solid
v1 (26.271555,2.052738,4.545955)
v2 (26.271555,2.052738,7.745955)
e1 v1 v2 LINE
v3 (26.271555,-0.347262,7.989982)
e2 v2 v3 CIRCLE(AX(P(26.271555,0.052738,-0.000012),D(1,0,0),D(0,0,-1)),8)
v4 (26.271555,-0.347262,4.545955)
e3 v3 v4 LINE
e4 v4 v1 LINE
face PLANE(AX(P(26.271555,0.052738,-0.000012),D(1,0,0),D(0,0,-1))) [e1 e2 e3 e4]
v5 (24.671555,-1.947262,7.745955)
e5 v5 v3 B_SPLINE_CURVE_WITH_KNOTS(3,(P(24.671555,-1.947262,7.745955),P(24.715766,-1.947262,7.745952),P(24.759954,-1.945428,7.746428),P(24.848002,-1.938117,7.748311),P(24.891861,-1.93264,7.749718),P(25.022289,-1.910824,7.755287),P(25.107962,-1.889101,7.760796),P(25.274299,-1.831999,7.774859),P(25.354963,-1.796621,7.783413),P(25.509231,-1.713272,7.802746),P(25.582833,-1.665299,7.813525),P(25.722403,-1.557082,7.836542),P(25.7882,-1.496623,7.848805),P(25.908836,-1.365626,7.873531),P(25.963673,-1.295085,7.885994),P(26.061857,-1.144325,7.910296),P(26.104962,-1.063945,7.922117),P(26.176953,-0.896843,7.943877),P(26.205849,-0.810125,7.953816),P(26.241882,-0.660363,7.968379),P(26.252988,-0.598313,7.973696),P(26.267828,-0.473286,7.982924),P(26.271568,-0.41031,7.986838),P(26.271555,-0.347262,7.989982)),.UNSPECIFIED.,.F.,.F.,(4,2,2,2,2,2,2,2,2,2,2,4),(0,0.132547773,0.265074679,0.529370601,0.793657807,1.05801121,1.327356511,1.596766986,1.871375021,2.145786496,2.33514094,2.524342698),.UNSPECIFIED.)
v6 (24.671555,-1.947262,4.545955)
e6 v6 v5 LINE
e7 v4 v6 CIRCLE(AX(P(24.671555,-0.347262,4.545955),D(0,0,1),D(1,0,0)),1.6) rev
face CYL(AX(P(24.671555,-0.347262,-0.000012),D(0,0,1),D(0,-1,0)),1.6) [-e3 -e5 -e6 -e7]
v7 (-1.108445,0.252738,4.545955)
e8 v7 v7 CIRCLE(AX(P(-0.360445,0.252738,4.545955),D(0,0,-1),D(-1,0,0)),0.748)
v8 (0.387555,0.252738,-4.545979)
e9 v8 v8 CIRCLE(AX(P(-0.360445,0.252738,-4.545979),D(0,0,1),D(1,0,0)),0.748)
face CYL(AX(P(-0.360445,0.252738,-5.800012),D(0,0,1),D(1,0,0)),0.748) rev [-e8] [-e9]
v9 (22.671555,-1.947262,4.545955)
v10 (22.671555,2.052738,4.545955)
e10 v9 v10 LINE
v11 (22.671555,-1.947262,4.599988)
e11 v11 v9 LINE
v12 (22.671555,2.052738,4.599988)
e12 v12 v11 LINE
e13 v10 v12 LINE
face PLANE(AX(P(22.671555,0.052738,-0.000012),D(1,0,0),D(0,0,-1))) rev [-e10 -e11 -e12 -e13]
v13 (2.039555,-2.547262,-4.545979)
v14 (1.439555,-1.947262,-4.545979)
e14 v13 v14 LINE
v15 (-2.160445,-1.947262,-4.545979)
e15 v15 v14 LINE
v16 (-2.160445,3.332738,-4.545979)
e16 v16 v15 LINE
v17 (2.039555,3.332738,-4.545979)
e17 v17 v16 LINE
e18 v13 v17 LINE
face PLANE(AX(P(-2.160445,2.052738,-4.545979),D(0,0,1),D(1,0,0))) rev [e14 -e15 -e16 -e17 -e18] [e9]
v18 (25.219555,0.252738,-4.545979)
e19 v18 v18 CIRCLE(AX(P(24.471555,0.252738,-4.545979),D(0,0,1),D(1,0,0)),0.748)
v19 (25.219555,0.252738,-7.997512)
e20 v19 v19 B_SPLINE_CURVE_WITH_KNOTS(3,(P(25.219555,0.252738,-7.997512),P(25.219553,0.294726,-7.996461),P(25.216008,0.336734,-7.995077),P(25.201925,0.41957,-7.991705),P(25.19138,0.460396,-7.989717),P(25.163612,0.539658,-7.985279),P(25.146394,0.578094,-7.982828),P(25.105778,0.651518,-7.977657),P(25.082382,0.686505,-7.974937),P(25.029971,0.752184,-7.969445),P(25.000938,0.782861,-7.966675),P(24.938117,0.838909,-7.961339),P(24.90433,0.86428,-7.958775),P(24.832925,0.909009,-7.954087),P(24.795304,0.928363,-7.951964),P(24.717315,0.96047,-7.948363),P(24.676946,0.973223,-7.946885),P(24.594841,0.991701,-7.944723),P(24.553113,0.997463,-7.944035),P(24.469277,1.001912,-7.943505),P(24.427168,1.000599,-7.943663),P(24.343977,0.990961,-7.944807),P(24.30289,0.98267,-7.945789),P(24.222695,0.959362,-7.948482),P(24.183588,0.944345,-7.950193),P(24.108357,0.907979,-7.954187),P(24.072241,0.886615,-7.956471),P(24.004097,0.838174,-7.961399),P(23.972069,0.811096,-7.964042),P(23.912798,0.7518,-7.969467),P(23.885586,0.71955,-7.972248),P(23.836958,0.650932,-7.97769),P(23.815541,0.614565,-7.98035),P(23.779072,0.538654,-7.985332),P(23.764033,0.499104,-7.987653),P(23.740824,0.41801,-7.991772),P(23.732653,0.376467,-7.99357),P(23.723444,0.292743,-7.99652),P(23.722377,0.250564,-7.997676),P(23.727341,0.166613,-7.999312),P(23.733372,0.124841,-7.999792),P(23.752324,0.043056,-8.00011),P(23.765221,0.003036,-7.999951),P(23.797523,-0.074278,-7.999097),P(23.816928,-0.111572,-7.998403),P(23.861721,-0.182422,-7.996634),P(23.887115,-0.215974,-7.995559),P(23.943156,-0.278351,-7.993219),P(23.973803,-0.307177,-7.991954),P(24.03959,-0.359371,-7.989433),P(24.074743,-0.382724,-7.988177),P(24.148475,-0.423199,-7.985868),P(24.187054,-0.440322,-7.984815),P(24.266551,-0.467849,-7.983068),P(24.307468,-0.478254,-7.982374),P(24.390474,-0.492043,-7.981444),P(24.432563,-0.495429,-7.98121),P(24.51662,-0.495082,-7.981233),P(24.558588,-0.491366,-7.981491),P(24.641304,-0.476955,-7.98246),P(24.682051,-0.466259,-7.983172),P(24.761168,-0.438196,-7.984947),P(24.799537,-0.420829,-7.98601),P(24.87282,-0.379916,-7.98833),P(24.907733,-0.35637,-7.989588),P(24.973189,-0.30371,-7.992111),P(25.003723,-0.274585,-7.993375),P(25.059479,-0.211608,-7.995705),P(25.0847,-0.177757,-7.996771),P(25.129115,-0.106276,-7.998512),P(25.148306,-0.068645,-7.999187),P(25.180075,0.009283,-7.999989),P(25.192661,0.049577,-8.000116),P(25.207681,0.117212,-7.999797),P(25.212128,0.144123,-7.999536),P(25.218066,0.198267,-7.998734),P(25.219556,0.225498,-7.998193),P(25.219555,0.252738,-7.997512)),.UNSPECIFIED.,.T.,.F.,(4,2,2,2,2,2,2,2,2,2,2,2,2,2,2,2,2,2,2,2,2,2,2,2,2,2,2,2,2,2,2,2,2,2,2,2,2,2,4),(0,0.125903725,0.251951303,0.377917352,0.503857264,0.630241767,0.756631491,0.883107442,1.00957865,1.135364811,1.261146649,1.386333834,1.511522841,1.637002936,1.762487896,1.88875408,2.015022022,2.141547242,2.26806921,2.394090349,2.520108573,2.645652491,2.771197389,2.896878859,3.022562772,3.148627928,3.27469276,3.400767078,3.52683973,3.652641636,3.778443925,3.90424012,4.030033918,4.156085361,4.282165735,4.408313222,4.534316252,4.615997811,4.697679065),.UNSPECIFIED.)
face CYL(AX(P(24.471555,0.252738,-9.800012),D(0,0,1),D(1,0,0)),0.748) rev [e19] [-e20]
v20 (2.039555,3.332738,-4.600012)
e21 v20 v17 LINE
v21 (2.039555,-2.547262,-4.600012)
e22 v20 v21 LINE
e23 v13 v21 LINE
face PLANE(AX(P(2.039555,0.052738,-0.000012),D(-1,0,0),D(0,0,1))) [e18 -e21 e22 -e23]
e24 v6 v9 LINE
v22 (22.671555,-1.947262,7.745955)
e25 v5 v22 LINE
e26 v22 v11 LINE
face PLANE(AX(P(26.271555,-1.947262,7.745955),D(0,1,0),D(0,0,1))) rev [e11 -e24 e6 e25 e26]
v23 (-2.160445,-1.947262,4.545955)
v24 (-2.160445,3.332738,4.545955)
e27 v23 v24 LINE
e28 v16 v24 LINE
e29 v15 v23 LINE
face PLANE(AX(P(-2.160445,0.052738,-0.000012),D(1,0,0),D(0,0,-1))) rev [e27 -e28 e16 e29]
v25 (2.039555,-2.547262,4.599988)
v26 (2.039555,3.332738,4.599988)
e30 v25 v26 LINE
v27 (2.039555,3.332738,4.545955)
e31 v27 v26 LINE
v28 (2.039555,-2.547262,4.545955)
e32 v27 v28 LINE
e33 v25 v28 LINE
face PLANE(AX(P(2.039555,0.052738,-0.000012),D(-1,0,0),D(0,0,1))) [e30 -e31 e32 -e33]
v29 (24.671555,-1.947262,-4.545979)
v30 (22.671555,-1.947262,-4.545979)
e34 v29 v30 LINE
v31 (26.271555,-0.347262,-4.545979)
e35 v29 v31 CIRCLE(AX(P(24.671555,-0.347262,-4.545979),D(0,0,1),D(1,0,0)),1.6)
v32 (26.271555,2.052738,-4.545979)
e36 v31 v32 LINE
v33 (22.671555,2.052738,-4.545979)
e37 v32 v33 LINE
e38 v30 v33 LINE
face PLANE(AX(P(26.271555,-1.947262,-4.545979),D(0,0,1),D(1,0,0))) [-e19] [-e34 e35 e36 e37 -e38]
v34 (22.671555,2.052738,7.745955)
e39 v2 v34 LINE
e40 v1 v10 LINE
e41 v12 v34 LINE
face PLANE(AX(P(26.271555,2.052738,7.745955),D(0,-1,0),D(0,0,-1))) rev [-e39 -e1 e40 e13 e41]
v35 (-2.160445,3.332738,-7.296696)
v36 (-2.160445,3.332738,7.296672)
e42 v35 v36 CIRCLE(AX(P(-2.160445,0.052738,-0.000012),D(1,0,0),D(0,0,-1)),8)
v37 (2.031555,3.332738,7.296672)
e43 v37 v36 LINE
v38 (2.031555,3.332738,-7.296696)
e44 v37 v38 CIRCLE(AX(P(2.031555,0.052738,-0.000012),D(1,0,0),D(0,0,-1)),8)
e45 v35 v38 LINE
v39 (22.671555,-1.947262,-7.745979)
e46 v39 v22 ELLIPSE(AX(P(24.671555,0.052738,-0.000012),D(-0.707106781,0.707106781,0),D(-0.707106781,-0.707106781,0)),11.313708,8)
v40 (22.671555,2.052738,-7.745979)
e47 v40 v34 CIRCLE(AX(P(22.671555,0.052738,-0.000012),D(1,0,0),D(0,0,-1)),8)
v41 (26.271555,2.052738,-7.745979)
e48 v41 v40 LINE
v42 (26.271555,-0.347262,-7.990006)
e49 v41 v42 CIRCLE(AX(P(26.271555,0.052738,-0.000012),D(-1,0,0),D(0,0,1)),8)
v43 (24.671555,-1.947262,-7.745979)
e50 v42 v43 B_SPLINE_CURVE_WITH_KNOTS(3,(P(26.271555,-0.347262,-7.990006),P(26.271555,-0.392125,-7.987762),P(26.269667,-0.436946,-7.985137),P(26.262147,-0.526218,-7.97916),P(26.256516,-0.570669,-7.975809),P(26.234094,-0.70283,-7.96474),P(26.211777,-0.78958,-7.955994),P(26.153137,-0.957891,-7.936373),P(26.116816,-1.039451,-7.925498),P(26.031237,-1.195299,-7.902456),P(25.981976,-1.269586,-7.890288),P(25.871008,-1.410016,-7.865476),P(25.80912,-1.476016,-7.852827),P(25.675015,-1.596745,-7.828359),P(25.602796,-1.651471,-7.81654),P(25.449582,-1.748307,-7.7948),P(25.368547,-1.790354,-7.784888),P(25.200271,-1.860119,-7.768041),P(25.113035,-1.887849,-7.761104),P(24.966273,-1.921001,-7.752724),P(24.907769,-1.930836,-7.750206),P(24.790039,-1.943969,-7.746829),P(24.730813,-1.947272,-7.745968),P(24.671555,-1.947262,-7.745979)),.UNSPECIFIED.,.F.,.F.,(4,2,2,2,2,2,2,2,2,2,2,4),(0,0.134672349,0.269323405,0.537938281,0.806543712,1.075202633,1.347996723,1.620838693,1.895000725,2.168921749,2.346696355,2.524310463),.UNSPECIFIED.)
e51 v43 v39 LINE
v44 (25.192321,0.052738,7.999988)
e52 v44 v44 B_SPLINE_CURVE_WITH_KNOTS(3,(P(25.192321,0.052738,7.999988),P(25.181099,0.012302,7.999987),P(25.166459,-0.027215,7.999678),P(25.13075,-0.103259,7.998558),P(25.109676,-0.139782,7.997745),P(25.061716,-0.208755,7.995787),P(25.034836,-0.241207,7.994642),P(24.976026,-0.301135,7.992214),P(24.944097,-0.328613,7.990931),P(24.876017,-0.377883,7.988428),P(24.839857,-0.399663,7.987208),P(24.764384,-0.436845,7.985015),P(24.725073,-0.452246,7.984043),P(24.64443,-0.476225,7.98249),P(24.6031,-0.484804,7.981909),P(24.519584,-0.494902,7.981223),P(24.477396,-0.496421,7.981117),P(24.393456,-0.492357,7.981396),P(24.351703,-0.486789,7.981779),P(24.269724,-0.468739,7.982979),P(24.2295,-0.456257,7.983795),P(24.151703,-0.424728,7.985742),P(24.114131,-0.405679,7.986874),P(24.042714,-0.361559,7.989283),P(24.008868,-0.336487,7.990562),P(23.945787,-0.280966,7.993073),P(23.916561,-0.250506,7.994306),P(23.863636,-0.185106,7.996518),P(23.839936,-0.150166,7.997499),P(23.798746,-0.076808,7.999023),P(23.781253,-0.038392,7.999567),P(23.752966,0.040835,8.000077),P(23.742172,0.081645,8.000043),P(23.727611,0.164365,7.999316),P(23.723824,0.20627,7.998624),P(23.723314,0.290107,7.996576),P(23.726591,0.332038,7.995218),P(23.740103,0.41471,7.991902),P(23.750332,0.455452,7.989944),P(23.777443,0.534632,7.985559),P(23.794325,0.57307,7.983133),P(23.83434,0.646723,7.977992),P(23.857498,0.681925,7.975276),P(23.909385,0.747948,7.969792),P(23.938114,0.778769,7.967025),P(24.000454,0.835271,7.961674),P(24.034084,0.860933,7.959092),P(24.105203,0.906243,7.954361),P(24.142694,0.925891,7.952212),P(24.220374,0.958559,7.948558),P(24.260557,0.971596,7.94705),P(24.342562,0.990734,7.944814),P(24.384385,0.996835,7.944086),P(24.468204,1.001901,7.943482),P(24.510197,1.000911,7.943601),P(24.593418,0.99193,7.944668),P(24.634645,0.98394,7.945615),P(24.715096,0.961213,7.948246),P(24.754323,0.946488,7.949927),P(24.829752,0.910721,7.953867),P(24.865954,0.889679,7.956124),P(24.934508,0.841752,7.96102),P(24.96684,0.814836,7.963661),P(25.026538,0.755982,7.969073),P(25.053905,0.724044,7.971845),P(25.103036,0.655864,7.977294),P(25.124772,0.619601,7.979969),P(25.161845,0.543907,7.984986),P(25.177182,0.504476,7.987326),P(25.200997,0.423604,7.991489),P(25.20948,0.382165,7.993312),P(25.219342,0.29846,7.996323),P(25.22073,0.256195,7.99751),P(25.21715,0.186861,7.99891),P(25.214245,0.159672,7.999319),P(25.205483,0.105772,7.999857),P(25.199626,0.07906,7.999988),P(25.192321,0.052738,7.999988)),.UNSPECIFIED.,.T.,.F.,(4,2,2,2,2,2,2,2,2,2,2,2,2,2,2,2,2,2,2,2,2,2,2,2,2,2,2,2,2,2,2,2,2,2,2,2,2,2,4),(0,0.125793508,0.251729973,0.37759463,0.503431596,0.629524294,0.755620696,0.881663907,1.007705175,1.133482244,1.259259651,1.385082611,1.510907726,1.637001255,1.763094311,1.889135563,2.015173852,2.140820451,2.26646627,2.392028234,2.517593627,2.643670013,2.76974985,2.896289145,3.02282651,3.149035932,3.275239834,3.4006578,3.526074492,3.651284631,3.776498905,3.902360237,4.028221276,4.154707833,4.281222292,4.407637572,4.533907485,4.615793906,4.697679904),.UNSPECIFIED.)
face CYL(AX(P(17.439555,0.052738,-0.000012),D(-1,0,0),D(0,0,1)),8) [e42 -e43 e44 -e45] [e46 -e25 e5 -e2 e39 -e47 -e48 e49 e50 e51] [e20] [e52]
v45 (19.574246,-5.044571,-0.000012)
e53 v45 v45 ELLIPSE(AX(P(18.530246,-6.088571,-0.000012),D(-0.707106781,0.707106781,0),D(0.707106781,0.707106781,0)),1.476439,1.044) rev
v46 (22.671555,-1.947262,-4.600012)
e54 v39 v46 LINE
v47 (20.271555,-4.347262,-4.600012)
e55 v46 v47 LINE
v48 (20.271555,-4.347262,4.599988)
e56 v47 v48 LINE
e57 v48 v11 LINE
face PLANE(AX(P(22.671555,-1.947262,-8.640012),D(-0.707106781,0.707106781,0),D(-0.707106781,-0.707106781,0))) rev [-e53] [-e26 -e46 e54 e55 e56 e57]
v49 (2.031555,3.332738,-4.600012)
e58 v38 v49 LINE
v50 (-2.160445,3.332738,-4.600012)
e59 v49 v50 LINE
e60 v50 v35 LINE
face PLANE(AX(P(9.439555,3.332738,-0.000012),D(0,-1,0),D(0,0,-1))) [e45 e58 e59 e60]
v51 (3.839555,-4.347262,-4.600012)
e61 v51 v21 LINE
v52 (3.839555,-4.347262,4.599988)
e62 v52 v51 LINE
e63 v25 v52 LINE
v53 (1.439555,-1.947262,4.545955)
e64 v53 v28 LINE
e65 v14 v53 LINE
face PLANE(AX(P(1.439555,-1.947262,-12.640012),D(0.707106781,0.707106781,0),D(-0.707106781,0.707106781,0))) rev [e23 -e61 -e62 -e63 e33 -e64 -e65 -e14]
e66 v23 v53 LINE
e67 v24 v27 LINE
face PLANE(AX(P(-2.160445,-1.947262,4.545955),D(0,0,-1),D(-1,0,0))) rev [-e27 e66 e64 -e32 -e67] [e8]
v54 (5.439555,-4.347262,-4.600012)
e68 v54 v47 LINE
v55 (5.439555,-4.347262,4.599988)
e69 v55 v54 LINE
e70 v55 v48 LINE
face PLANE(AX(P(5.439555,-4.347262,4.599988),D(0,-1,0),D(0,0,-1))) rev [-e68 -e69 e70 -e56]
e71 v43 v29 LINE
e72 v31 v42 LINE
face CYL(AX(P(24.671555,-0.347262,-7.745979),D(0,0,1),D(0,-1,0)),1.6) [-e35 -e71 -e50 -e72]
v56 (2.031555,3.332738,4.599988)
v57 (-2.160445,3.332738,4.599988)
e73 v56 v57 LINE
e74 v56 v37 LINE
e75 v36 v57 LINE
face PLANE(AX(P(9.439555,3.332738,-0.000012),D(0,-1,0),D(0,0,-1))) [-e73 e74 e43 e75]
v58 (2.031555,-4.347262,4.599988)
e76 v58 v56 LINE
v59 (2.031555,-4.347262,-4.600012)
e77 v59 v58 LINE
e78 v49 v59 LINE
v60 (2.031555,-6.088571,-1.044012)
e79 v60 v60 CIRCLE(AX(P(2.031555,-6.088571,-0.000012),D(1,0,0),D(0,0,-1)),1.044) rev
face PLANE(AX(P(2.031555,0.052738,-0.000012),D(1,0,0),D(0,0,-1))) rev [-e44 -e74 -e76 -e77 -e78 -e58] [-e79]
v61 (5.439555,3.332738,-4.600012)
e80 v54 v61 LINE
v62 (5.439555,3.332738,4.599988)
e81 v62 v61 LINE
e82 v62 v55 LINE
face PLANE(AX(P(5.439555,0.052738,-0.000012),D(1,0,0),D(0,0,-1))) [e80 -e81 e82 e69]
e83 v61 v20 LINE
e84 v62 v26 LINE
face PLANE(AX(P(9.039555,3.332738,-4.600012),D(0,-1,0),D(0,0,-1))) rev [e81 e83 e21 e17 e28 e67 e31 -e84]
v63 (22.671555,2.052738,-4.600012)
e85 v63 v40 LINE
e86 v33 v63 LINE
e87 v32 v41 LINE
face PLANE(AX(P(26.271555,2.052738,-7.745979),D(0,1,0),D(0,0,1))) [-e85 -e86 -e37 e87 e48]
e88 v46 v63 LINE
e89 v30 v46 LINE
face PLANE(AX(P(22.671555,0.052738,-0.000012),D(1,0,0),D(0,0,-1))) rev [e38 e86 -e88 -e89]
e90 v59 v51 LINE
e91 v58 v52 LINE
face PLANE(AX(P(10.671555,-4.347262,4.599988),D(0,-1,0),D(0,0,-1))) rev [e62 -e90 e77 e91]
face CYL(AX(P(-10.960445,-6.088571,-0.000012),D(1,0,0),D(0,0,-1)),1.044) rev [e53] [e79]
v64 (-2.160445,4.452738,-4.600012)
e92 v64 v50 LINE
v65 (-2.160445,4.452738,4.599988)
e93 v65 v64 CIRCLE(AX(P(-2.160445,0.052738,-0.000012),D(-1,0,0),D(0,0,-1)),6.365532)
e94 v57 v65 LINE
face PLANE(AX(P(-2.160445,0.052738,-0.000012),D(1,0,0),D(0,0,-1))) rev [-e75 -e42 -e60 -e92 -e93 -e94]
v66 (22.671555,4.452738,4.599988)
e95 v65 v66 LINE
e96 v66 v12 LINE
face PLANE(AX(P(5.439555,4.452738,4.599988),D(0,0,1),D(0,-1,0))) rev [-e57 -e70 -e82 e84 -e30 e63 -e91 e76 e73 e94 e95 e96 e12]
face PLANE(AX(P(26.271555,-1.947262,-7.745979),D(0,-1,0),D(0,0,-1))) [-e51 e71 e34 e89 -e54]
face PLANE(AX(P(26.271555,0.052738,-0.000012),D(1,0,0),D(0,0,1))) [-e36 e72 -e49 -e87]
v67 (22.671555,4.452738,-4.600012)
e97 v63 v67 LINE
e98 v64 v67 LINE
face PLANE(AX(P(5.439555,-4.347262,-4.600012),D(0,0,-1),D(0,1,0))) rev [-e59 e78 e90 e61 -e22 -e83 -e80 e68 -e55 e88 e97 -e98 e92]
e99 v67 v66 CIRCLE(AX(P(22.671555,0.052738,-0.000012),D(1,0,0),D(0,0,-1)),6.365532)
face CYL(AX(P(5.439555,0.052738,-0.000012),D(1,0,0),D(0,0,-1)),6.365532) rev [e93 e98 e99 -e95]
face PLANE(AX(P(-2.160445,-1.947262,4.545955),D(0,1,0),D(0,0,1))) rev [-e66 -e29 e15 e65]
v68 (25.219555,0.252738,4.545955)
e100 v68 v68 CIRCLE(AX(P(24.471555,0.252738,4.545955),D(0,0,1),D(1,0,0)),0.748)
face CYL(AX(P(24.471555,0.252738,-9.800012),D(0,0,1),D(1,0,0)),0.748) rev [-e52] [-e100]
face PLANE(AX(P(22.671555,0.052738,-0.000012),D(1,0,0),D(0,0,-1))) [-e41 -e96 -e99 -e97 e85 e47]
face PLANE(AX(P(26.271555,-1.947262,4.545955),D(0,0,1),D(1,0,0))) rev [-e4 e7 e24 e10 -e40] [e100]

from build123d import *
from build123d.topology import SkipClean

# Parameters (mm, degrees)
SKETCH1_R           = 10
BOSS_EXTRUDE1_DEPTH = 10
SKETCH4_R           = 1.305
CUT_EXTRUDE3_DEPTH  = 25.5
BOSS_EXTRUDE2_START = 4.5
BOSS_EXTRUDE2_DEPTH = 4.5
SKETCH6_R           = 0.935
CUT_EXTRUDE4_DEPTH  = 12.25
SKETCH7_W           = 11.364916732
SKETCH7_H           = 5
BOSS_EXTRUDE3_DEPTH = 4.5
SKETCH8_R           = 0.935
CUT_EXTRUDE5_DEPTH  = 7.25
BOSS_EXTRUDE4_DEPTH = 4.5
CUT_EXTRUDE6_START  = -0.75
CUT_EXTRUDE6_DEPTH  = 0.75
SKETCH12_W          = 5.25
SKETCH12_H          = 4
CUT_EXTRUDE7_DEPTH  = 1.6
CUT_EXTRUDE8_DEPTH  = 15.8
FILLET1_R           = 2
CUT_EXTRUDE9_DEPTH  = 10.8
SKETCH15_W          = 11.364916732
SKETCH15_H          = 6.6
CUT_EXTRUDE10_DEPTH = 1.6
CUT_EXTRUDE11_DEPTH = 15
BOSS_EXTRUDE5_REACH = 35.438
SKETCH17_R          = 10
SKETCH17_R_2        = 1.305
CUT_EXTRUDE12_DEPTH = 14
SCALE1_SCALE        = 0.8


# Read off the part's stored shape, not the designer's step: Cut-Extrude6
with BuildPart() as part:
    # Sketch1 → Boss-Extrude1 (new, symmetric)
    with BuildSketch(Plane(origin=(0, 0, 0), x_dir=(0, 0, -1), z_dir=(1, 0, 0))):
        Circle(SKETCH1_R)
    extrude(amount=BOSS_EXTRUDE1_DEPTH, both=True)

    # Sketch4 → Cut-Extrude3 (cut, symmetric)
    with BuildSketch(Plane(origin=(0, -0.76336978, 0), x_dir=(0, 0, -1), z_dir=(1, 0, 0))):
        with Locations((0, -6.913267104)):
            Circle(SKETCH4_R)
    extrude(amount=CUT_EXTRUDE3_DEPTH, both=True, mode=Mode.SUBTRACT)

    # Sketch5 → Boss-Extrude2 (add)
    with BuildSketch(Plane(origin=(10, 0, 0), x_dir=(0, 0, -1), z_dir=(1, 0, 0)).offset(BOSS_EXTRUDE2_START)):
        with BuildLine():
            Line((-9.682458366, -2.5), (-5.682458366, -2.5))
            Line((-5.682458366, -2.5), (-5.682458366, 2.5))
            Line((-5.682458366, 2.5), (-9.682458366, 2.5))
            ThreePointArc((-9.682458366, 2.5), (-10, 0), (-9.682458366, -2.5))
        make_face()
    boss_extrude2 = extrude(amount=-BOSS_EXTRUDE2_DEPTH)

    # Mirror1: Boss-Extrude2 across plane
    add(boss_extrude2.mirror(Plane.XY))

    # Sketch6 → Cut-Extrude4 (cut, symmetric)
    with SkipClean():  # the faces are left unmerged after this step: merging them gives an invalid solid
        with BuildSketch(Plane.XY):
            with Locations((12.25, 0.25)):
                Circle(SKETCH6_R)
        extrude(amount=CUT_EXTRUDE4_DEPTH, both=True, mode=Mode.SUBTRACT)

    # Sketch7 → Boss-Extrude3 (add)
    with SkipClean():  # the faces are left unmerged after this step: merging them gives an invalid solid
        with BuildSketch(Plane.ZY.offset(10)):
            Rectangle(SKETCH7_W, SKETCH7_H)
        extrude(amount=BOSS_EXTRUDE3_DEPTH)

    # Sketch8 → Cut-Extrude5 (cut, symmetric)
    with SkipClean():  # the faces are left unmerged after this step: merging them gives an invalid solid
        with BuildSketch(Plane.XY):
            with Locations((-12.25, 0.25)):
                Circle(SKETCH8_R)
        extrude(amount=CUT_EXTRUDE5_DEPTH, both=True, mode=Mode.SUBTRACT)

    # Sketch10 → Boss-Extrude4 (add)
    with SkipClean():  # the faces are left unmerged after this step: merging them gives an invalid solid
        with BuildSketch(Plane.ZY.offset(10)):
            with BuildLine():
                Line((9.682458366, 2.5), (-9.682458366, 2.5))
                ThreePointArc((-9.682458366, 2.5), (0, 10), (9.682458366, 2.5))
            make_face()
        extrude(amount=BOSS_EXTRUDE4_DEPTH)

    # Cut-Extrude6 outline → Cut-Extrude6 (cut)
    with SkipClean():  # the faces are left unmerged after this step: merging them gives an invalid solid
        with BuildSketch(Plane.ZY.offset(10).offset(CUT_EXTRUDE6_START)):
            with BuildLine():
                ThreePointArc((-9.682458366, 2.5), (-9.369942303, -3.493448331), (-5.682458366, -8.228588392))
                Line((-5.682458366, -8.228588392), (-5.682458366, 2.5))
                Line((-5.682458366, 2.5), (-9.682458366, 2.5))
            make_face()
            with BuildLine():
                Line((5.682458366, 2.5), (5.682458366, -8.228588392))
                ThreePointArc((5.682458366, -8.228588392), (9.369942303, -3.493448331), (9.682458366, 2.5))
                Line((9.682458366, 2.5), (5.682458366, 2.5))
            make_face()
        extrude(amount=CUT_EXTRUDE6_DEPTH, mode=Mode.SUBTRACT)

    # Sketch12 → Cut-Extrude7 (cut)
    with SkipClean():  # the faces are left unmerged after this step: merging them gives an invalid solid
        with BuildSketch(Plane.XZ.offset(-2.5)):
            with Locations((-11.875, -7.682458366)):
                Rectangle(SKETCH12_W, SKETCH12_H)
            with Locations((-11.875, 7.682458366)):
                Rectangle(SKETCH12_W, SKETCH12_H)
        extrude(amount=-CUT_EXTRUDE7_DEPTH, mode=Mode.SUBTRACT)

    # Sketch13 → Cut-Extrude8 (cut, symmetric)
    with SkipClean():  # the faces are left unmerged after this step: merging them gives an invalid solid
        with BuildSketch(Plane.XY):
            Polygon((-10, -8.228588392), (-10, -2.5), (-2.5, -10), (-10, -10), align=None)
        extrude(amount=CUT_EXTRUDE8_DEPTH, both=True, mode=Mode.SUBTRACT)

    # Fillet1
    fillet1_edges = [part.edges().sort_by_distance(p)[0] for p in [
        (14.5, -2.5, 7.682458366),
        (14.5, -2.5, -7.682458366),
    ]]
    fillet(fillet1_edges, radius=FILLET1_R)

    # Sketch14 → Cut-Extrude9 (cut, symmetric)
    with SkipClean():  # the faces are left unmerged after this step: merging them gives an invalid solid
        with BuildSketch(Plane.XY):
            Polygon((10, -10), (10, -2.5), (2.5, -10), align=None)
        extrude(amount=CUT_EXTRUDE9_DEPTH, both=True, mode=Mode.SUBTRACT)

    # Sketch15 → Cut-Extrude10 (cut)
    with SkipClean():  # the faces are left unmerged after this step: merging them gives an invalid solid
        with BuildSketch(Plane(origin=(10, 0, 0), x_dir=(0, 0, -1), z_dir=(1, 0, 0))):
            with Locations((0, -0.8)):
                Rectangle(SKETCH15_W, SKETCH15_H)
        extrude(amount=-CUT_EXTRUDE10_DEPTH, mode=Mode.SUBTRACT)

    # Sketch16 → Cut-Extrude11 (cut)
    with SkipClean():  # the faces are left unmerged after this step: merging them gives an invalid solid
        with BuildSketch(Plane(origin=(10, 0, 0), x_dir=(0, 0, -1), z_dir=(1, 0, 0))):
            with BuildLine():
                Line((-5.75, 5.5), (-5.75, -5.5))
                Line((-5.75, -5.5), (5.75, -5.5))
                Line((5.75, -5.5), (5.75, 5.5))
                ThreePointArc((5.75, 5.5), (0, 7.956915231), (-5.75, 5.5))
            make_face()
        extrude(amount=-CUT_EXTRUDE11_DEPTH, mode=Mode.SUBTRACT)


with BuildPart() as body_2:
    # Split1: the piece on the far side of the plane
    add(part.part)
    split(bisect_by=Plane(origin=(0, 0, 0), x_dir=(0, 0, 1), z_dir=(1, 0, 0)), keep=Keep.BOTTOM)


with BuildPart() as part_1:
    add(part.part)

    # Split1
    split(bisect_by=Plane(origin=(0, 0, 0), x_dir=(0, 0, 1), z_dir=(1, 0, 0)), keep=Keep.TOP)


with BuildPart() as part_2:
    # Body-Move/Copy1: moved
    add(part_1.part.moved(Location((15.8, 0, 0))))


    # Sketch17 → Boss-Extrude5 (add, up to next)
    with BuildSketch(Plane.ZY.offset(-15.8), mode=Mode.PRIVATE) as boss_extrude5_sk1:
        with Locations(Location((0, 0, 0), (0, 0, 357.134016017))):
            Circle(SKETCH17_R)
        with Locations(Location((0, -7.676636884, 0), (0, 0, 180))):
            Circle(SKETCH17_R_2, mode=Mode.SUBTRACT)
        with BuildLine():
            Line((-5.75, -5.5), (5.75, -5.5))
            Line((5.75, -5.5), (5.75, 5.5))
            ThreePointArc((5.75, 5.5), (0, 7.956915231), (-5.75, 5.5))
            Line((-5.75, 5.5), (-5.75, -5.5))
        make_face(mode=Mode.SUBTRACT)
    boss_extrude5_tool1 = extrude(boss_extrude5_sk1.sketch, amount=BOSS_EXTRUDE5_REACH, mode=Mode.PRIVATE) - body_2.part
    add(boss_extrude5_tool1.solids().sort_by_distance((15.8, 0.485858, -9.705003))[0])


with BuildPart() as body_2_1:
    # Body-Move/Copy2: moved
    add(body_2.part.moved(Location((9.26, 0, 0))))

    # Combine4: union part
    add(part_2.part)

    # Sketch18 → Cut-Extrude12 (cut)
    with SkipClean():  # the faces are left unmerged after this step: merging them gives an invalid solid
        with BuildSketch(Plane.ZY.offset(5.24)):
            with BuildLine():
                Line((-5.75, 5.5), (-5.75, 4.1))
                Line((-5.75, 4.1), (5.75, 4.1))
                Line((5.75, 4.1), (5.75, 5.5))
                ThreePointArc((5.75, 5.5), (0, 7.956915231), (-5.75, 5.5))
            make_face()
        extrude(amount=-CUT_EXTRUDE12_DEPTH, mode=Mode.SUBTRACT)


with BuildPart() as body_2_2:
    # Scale1: scaled about (10.157754057, 0.26372377, 1.86e-07)
    add(body_2_1.part.scale(SCALE1_SCALE).moved(Location((2.031550811, 0.052744754, 3.7e-08))))


solid = body_2_2.part
